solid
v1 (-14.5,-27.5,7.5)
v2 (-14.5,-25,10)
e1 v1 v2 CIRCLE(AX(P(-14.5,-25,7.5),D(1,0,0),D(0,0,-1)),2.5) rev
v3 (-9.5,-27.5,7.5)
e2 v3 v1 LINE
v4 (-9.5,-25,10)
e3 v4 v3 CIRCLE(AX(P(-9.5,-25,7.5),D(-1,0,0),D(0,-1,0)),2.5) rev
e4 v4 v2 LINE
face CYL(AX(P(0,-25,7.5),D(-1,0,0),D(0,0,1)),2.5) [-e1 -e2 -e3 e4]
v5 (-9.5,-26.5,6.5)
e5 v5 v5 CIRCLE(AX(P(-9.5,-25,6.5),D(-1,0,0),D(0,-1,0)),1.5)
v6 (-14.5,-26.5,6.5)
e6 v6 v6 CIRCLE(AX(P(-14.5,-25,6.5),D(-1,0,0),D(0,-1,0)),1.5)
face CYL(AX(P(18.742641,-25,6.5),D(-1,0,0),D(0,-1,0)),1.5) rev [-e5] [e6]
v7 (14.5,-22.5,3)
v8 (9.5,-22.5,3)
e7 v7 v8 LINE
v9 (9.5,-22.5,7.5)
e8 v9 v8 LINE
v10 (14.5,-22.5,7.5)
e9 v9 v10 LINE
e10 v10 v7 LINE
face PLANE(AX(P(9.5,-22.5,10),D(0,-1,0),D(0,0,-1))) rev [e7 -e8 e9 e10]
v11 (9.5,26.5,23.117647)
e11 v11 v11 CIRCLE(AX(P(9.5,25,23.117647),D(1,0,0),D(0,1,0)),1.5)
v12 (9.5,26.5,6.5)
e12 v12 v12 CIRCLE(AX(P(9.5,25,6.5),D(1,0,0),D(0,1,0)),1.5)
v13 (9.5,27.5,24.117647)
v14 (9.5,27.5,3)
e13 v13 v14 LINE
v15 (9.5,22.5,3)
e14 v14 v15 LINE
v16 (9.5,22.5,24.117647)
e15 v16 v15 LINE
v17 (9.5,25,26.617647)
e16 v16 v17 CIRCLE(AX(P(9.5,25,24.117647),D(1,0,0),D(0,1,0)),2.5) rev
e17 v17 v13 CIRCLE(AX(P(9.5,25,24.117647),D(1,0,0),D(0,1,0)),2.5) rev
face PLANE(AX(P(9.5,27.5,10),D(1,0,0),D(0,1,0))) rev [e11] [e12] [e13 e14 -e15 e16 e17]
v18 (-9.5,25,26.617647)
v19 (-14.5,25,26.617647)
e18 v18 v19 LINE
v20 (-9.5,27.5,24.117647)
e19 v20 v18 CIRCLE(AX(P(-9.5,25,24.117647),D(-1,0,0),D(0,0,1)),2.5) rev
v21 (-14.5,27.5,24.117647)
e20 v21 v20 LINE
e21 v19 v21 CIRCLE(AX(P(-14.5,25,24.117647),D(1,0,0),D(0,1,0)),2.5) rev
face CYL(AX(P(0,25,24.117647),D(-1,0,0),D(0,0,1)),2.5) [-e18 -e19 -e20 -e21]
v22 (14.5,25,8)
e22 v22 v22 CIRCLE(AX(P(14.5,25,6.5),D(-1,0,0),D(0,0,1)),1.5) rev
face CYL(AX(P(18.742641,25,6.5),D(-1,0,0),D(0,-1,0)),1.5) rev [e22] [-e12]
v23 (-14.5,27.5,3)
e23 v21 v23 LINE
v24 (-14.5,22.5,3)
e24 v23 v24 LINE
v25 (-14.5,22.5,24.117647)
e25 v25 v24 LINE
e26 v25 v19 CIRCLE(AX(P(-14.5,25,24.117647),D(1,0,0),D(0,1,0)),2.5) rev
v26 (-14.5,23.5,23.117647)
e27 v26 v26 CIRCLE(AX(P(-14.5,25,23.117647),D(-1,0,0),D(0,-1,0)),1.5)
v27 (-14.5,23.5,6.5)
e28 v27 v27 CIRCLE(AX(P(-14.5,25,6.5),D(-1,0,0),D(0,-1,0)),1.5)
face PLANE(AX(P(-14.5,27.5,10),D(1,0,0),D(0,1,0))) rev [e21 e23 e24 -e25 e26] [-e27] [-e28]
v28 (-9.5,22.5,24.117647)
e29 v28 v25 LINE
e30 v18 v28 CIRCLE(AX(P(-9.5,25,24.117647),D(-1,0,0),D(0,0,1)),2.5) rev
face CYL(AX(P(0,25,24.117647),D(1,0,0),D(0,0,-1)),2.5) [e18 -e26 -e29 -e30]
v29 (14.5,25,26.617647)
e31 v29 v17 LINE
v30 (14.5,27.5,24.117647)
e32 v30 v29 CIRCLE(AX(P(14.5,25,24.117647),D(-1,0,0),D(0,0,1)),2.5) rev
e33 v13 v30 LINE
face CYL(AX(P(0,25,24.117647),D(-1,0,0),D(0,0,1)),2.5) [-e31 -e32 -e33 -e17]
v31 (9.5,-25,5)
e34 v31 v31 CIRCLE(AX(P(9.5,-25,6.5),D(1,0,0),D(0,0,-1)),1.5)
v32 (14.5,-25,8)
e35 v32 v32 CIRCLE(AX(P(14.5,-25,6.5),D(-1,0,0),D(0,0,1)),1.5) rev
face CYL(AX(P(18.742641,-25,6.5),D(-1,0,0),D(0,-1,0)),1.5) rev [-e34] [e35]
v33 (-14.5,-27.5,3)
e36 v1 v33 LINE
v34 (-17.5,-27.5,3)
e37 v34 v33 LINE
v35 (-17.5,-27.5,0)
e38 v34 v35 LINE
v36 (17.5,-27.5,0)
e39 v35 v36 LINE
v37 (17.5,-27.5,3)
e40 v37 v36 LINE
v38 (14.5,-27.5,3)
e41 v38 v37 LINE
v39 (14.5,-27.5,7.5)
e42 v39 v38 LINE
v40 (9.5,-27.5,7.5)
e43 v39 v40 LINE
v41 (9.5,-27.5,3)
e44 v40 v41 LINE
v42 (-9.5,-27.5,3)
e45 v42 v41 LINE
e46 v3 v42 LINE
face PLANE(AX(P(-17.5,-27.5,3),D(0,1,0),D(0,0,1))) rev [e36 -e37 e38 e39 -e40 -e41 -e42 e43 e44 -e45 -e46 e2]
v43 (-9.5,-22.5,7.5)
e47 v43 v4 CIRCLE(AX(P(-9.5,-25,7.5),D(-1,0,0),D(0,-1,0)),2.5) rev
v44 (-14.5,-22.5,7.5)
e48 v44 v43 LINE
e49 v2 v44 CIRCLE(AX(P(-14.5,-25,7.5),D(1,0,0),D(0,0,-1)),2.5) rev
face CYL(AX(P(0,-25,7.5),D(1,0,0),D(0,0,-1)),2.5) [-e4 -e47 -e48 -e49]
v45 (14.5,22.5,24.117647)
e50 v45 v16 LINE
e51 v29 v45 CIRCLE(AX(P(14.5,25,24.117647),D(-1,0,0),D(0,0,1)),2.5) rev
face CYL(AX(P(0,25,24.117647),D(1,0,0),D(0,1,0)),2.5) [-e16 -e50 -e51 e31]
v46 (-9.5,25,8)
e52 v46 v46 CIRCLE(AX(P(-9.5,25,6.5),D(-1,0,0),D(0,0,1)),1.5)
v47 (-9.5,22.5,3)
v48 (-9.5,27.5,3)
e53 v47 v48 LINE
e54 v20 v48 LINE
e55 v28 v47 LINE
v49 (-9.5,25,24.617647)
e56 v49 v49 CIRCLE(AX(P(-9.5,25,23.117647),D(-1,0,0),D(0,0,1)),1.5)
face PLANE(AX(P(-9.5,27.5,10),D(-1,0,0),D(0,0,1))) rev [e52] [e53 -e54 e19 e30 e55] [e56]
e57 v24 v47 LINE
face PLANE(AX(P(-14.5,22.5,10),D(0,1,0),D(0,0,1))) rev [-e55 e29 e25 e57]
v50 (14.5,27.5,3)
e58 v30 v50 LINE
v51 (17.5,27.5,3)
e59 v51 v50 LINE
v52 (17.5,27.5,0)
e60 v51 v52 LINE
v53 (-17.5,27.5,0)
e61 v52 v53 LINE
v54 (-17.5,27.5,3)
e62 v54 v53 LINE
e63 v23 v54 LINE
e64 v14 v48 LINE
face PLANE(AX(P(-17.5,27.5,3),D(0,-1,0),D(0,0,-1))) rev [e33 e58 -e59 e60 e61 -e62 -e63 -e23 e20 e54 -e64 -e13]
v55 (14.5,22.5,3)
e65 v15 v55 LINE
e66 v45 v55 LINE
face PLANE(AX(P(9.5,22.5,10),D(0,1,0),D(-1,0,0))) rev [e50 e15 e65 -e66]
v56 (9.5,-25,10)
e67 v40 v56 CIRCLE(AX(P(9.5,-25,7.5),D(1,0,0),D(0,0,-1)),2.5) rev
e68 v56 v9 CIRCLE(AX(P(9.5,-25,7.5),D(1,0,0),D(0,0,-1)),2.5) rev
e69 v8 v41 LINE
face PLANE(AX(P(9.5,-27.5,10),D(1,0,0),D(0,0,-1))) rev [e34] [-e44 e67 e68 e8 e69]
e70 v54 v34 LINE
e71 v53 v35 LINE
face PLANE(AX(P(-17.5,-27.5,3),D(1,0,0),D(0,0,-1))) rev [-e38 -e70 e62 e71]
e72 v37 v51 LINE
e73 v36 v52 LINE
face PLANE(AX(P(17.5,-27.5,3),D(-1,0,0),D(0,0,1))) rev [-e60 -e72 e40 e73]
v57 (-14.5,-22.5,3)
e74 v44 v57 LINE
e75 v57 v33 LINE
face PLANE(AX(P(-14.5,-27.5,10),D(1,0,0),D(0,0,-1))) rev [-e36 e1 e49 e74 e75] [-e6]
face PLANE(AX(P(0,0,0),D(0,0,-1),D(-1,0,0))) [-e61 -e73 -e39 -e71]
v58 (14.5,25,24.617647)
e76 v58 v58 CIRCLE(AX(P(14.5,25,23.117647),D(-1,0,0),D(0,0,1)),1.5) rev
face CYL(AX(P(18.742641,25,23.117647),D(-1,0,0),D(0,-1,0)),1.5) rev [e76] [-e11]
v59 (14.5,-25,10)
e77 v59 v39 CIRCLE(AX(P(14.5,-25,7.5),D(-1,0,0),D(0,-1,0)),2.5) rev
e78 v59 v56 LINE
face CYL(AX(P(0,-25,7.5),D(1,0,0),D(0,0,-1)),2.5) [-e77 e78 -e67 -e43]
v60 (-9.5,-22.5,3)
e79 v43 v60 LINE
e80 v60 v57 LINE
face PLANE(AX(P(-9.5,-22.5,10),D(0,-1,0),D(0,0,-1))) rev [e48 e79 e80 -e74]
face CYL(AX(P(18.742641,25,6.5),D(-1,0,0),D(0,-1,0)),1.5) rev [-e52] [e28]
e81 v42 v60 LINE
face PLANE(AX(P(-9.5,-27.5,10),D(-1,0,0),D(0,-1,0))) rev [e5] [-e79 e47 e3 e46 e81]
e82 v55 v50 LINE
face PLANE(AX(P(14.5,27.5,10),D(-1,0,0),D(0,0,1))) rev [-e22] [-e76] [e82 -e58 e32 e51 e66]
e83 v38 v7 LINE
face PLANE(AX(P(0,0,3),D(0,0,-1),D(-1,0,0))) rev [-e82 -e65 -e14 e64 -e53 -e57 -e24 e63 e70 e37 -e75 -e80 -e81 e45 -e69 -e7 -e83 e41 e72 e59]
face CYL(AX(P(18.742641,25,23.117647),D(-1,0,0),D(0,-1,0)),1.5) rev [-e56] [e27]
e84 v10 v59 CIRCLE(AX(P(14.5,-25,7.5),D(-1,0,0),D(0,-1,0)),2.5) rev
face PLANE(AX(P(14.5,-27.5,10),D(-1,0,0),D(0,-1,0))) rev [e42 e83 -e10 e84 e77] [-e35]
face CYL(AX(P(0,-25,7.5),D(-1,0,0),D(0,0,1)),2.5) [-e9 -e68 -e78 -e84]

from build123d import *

# Parameters (mm, degrees)
SKETCH1_W           = 35
SKETCH1_H           = 55
BOSS_EXTRUDE1_DEPTH = 3
SKETCH2_W           = 5
SKETCH2_H           = 5
BOSS_EXTRUDE2_DEPTH = 7
CUT_EXTRUDE1_REACH  = 45.362
FILLET1_R           = 2.5
SKETCH4_W           = 5
SKETCH4_H           = 5
BOSS_EXTRUDE3_DEPTH = 16.61764706
CUT_EXTRUDE2_REACH  = 51.887
FILLET2_R           = 2.5


with BuildPart() as part:
    # Sketch1 → Boss-Extrude1 (new body)
    with BuildSketch(Plane.XY):
        Rectangle(SKETCH1_W, SKETCH1_H)
    extrude(amount=BOSS_EXTRUDE1_DEPTH)

    # Sketch2 → Boss-Extrude2 (add)
    with BuildSketch(Plane.XY.offset(3)):
        with Locations((-12, 25)):
            Rectangle(SKETCH2_W, SKETCH2_H)
        with Locations((12, 25)):
            Rectangle(SKETCH2_W, SKETCH2_H)
        with Locations((-12, -25)):
            Rectangle(SKETCH2_W, SKETCH2_H)
        with Locations((12, -25)):
            Rectangle(SKETCH2_W, SKETCH2_H)
    extrude(amount=BOSS_EXTRUDE2_DEPTH)

    # Cut-Extrude1: up to this face of the body (flat: up to its plane)
    cut_extrude1_end = Plane(part.part.faces().sort_by_distance((14.5, 25, 6.5))[0])
    # Sketch3 → Cut-Extrude1 (cut, up to the picked face)
    with BuildSketch(Plane.ZY.offset(14.5), mode=Mode.PRIVATE) as cut_extrude1_sk1:
        with BuildLine():
            ThreePointArc((8, 25), (6.957766147, 26.428443263), (5.279399793, 25.871857291))
            Line((5.279399793, 25.871857291), (7.720600207, 24.128142709))
            ThreePointArc((7.720600207, 24.128142709), (7.928443263, 24.542233853), (8, 25))
        make_face()
    cut_extrude1_tool1 = split(extrude(cut_extrude1_sk1.sketch, amount=-CUT_EXTRUDE1_REACH, mode=Mode.PRIVATE), bisect_by=cut_extrude1_end, keep=Keep.BOTH, mode=Mode.PRIVATE)
    # Sketch3 → Cut-Extrude1 (cut, up to the picked face)
    with BuildSketch(Plane.ZY.offset(14.5), mode=Mode.PRIVATE) as cut_extrude1_sk2:
        with BuildLine():
            Line((7.720600207, 24.128142709), (5.279399793, 25.871857291))
            ThreePointArc((5.279399793, 25.871857291), (5.628142709, 23.779399793), (7.720600207, 24.128142709))
        make_face()
    cut_extrude1_tool2 = split(extrude(cut_extrude1_sk2.sketch, amount=-CUT_EXTRUDE1_REACH, mode=Mode.PRIVATE), bisect_by=cut_extrude1_end, keep=Keep.BOTH, mode=Mode.PRIVATE)
    # Sketch3 → Cut-Extrude1 (cut, up to the picked face)
    with BuildSketch(Plane.ZY.offset(14.5), mode=Mode.PRIVATE) as cut_extrude1_sk3:
        with BuildLine():
            ThreePointArc((8, 25), (6.957766147, 26.428443263), (5.279399793, 25.871857291))
            Line((5.279399793, 25.871857291), (7.720600207, 24.128142709))
            ThreePointArc((7.720600207, 24.128142709), (7.928443263, 24.542233853), (8, 25))
        make_face()
    cut_extrude1_tool3 = split(extrude(cut_extrude1_sk3.sketch, amount=-CUT_EXTRUDE1_REACH, mode=Mode.PRIVATE), bisect_by=cut_extrude1_end, keep=Keep.BOTH, mode=Mode.PRIVATE)
    # Sketch3 → Cut-Extrude1 (cut, up to the picked face)
    with BuildSketch(Plane.ZY.offset(14.5), mode=Mode.PRIVATE) as cut_extrude1_sk4:
        with BuildLine():
            Line((7.720600207, 24.128142709), (5.279399793, 25.871857291))
            ThreePointArc((5.279399793, 25.871857291), (5.628142709, 23.779399793), (7.720600207, 24.128142709))
        make_face()
    cut_extrude1_tool4 = split(extrude(cut_extrude1_sk4.sketch, amount=-CUT_EXTRUDE1_REACH, mode=Mode.PRIVATE), bisect_by=cut_extrude1_end, keep=Keep.BOTH, mode=Mode.PRIVATE)
    # Sketch3 → Cut-Extrude1 (cut, up to the picked face)
    with BuildSketch(Plane.ZY.offset(14.5), mode=Mode.PRIVATE) as cut_extrude1_sk5:
        with BuildLine():
            ThreePointArc((8, -25), (6.957766147, -23.571556737), (5.279399793, -24.128142709))
            Line((5.279399793, -24.128142709), (7.720600207, -25.871857291))
            ThreePointArc((7.720600207, -25.871857291), (7.928443263, -25.457766147), (8, -25))
        make_face()
    cut_extrude1_tool5 = split(extrude(cut_extrude1_sk5.sketch, amount=-CUT_EXTRUDE1_REACH, mode=Mode.PRIVATE), bisect_by=cut_extrude1_end, keep=Keep.BOTH, mode=Mode.PRIVATE)
    # Sketch3 → Cut-Extrude1 (cut, up to the picked face)
    with BuildSketch(Plane.ZY.offset(14.5), mode=Mode.PRIVATE) as cut_extrude1_sk6:
        with BuildLine():
            Line((7.720600207, -25.871857291), (5.279399793, -24.128142709))
            ThreePointArc((5.279399793, -24.128142709), (5.628142709, -26.220600207), (7.720600207, -25.871857291))
        make_face()
    cut_extrude1_tool6 = split(extrude(cut_extrude1_sk6.sketch, amount=-CUT_EXTRUDE1_REACH, mode=Mode.PRIVATE), bisect_by=cut_extrude1_end, keep=Keep.BOTH, mode=Mode.PRIVATE)
    # Sketch3 → Cut-Extrude1 (cut, up to the picked face)
    with BuildSketch(Plane.ZY.offset(14.5), mode=Mode.PRIVATE) as cut_extrude1_sk7:
        with BuildLine():
            ThreePointArc((8, -25), (6.957766147, -23.571556737), (5.279399793, -24.128142709))
            Line((5.279399793, -24.128142709), (7.720600207, -25.871857291))
            ThreePointArc((7.720600207, -25.871857291), (7.928443263, -25.457766147), (8, -25))
        make_face()
    cut_extrude1_tool7 = split(extrude(cut_extrude1_sk7.sketch, amount=-CUT_EXTRUDE1_REACH, mode=Mode.PRIVATE), bisect_by=cut_extrude1_end, keep=Keep.BOTH, mode=Mode.PRIVATE)
    # Sketch3 → Cut-Extrude1 (cut, up to the picked face)
    with BuildSketch(Plane.ZY.offset(14.5), mode=Mode.PRIVATE) as cut_extrude1_sk8:
        with BuildLine():
            Line((7.720600207, -25.871857291), (5.279399793, -24.128142709))
            ThreePointArc((5.279399793, -24.128142709), (5.628142709, -26.220600207), (7.720600207, -25.871857291))
        make_face()
    cut_extrude1_tool8 = split(extrude(cut_extrude1_sk8.sketch, amount=-CUT_EXTRUDE1_REACH, mode=Mode.PRIVATE), bisect_by=cut_extrude1_end, keep=Keep.BOTH, mode=Mode.PRIVATE)
    add(cut_extrude1_tool1.solids().sort_by(Axis((-14.5, 25.518039, 6.870028), (1, 0, 0)))[0], mode=Mode.SUBTRACT)
    add(cut_extrude1_tool2.solids().sort_by(Axis((-14.5, 24.481961, 6.129972), (1, 0, 0)))[0], mode=Mode.SUBTRACT)
    add(cut_extrude1_tool3.solids().sort_by(Axis((-14.5, 25.518039, 6.870028), (1, 0, 0)))[0], mode=Mode.SUBTRACT)
    add(cut_extrude1_tool4.solids().sort_by(Axis((-14.5, 24.481961, 6.129972), (1, 0, 0)))[0], mode=Mode.SUBTRACT)
    add(cut_extrude1_tool5.solids().sort_by(Axis((-14.5, -24.481961, 6.870028), (1, 0, 0)))[0], mode=Mode.SUBTRACT)
    add(cut_extrude1_tool6.solids().sort_by(Axis((-14.5, -25.518039, 6.129972), (1, 0, 0)))[0], mode=Mode.SUBTRACT)
    add(cut_extrude1_tool7.solids().sort_by(Axis((-14.5, -24.481961, 6.870028), (1, 0, 0)))[0], mode=Mode.SUBTRACT)
    add(cut_extrude1_tool8.solids().sort_by(Axis((-14.5, -25.518039, 6.129972), (1, 0, 0)))[0], mode=Mode.SUBTRACT)

    # Fillet1
    fillet1_edges = [part.edges().sort_by_distance(p)[0] for p in [
        (12, -27.5, 10),
        (12, -22.5, 10),
        (-12, -27.5, 10),
        (-12, -22.5, 10),
    ]]
    fillet(fillet1_edges, radius=FILLET1_R - 0.0001)  # a hair under: the kernel refuses the full size

    # Sketch4 → Boss-Extrude3 (add)
    with BuildSketch(Plane.XY.offset(10)):
        with Locations((-12, 25)):
            Rectangle(SKETCH4_W, SKETCH4_H)
        with Locations((12, 25)):
            Rectangle(SKETCH4_W, SKETCH4_H)
    extrude(amount=BOSS_EXTRUDE3_DEPTH)

    # Cut-Extrude2: up to this face of the body (flat: up to its plane)
    cut_extrude2_end = Plane(part.part.faces().sort_by_distance((14.5, 25, 15.337843498))[0])
    # Sketch5 → Cut-Extrude2 (cut, up to the picked face)
    with BuildSketch(Plane.ZY.offset(14.5), mode=Mode.PRIVATE) as cut_extrude2_sk1:
        with BuildLine():
            ThreePointArc((24.61764706, 25), (23.575413207, 26.428443263), (21.897046853, 25.871857291))
            Line((21.897046853, 25.871857291), (24.338247267, 24.128142709))
            ThreePointArc((24.338247267, 24.128142709), (24.546090323, 24.542233853), (24.61764706, 25))
        make_face()
    cut_extrude2_tool1 = split(extrude(cut_extrude2_sk1.sketch, amount=-CUT_EXTRUDE2_REACH, mode=Mode.PRIVATE), bisect_by=cut_extrude2_end, keep=Keep.BOTH, mode=Mode.PRIVATE)
    # Sketch5 → Cut-Extrude2 (cut, up to the picked face)
    with BuildSketch(Plane.ZY.offset(14.5), mode=Mode.PRIVATE) as cut_extrude2_sk2:
        with BuildLine():
            Line((24.338247267, 24.128142709), (21.897046853, 25.871857291))
            ThreePointArc((21.897046853, 25.871857291), (22.245789769, 23.779399793), (24.338247267, 24.128142709))
        make_face()
    cut_extrude2_tool2 = split(extrude(cut_extrude2_sk2.sketch, amount=-CUT_EXTRUDE2_REACH, mode=Mode.PRIVATE), bisect_by=cut_extrude2_end, keep=Keep.BOTH, mode=Mode.PRIVATE)
    # Sketch5 → Cut-Extrude2 (cut, up to the picked face)
    with BuildSketch(Plane.ZY.offset(14.5), mode=Mode.PRIVATE) as cut_extrude2_sk3:
        with BuildLine():
            ThreePointArc((24.61764706, 25), (23.575413207, 26.428443263), (21.897046853, 25.871857291))
            Line((21.897046853, 25.871857291), (24.338247267, 24.128142709))
            ThreePointArc((24.338247267, 24.128142709), (24.546090323, 24.542233853), (24.61764706, 25))
        make_face()
    cut_extrude2_tool3 = split(extrude(cut_extrude2_sk3.sketch, amount=-CUT_EXTRUDE2_REACH, mode=Mode.PRIVATE), bisect_by=cut_extrude2_end, keep=Keep.BOTH, mode=Mode.PRIVATE)
    # Sketch5 → Cut-Extrude2 (cut, up to the picked face)
    with BuildSketch(Plane.ZY.offset(14.5), mode=Mode.PRIVATE) as cut_extrude2_sk4:
        with BuildLine():
            Line((24.338247267, 24.128142709), (21.897046853, 25.871857291))
            ThreePointArc((21.897046853, 25.871857291), (22.245789769, 23.779399793), (24.338247267, 24.128142709))
        make_face()
    cut_extrude2_tool4 = split(extrude(cut_extrude2_sk4.sketch, amount=-CUT_EXTRUDE2_REACH, mode=Mode.PRIVATE), bisect_by=cut_extrude2_end, keep=Keep.BOTH, mode=Mode.PRIVATE)
    add(cut_extrude2_tool1.solids().sort_by(Axis((-14.5, 25.518039, 23.487675), (1, 0, 0)))[0], mode=Mode.SUBTRACT)
    add(cut_extrude2_tool2.solids().sort_by(Axis((-14.5, 24.481961, 22.747619), (1, 0, 0)))[0], mode=Mode.SUBTRACT)
    add(cut_extrude2_tool3.solids().sort_by(Axis((-14.5, 25.518039, 23.487675), (1, 0, 0)))[0], mode=Mode.SUBTRACT)
    add(cut_extrude2_tool4.solids().sort_by(Axis((-14.5, 24.481961, 22.747619), (1, 0, 0)))[0], mode=Mode.SUBTRACT)

    # Fillet2
    fillet2_edges = [part.edges().sort_by_distance(p)[0] for p in [
        (12, 22.5, 26.61764706),
        (12, 27.5, 26.61764706),
        (-12, 22.5, 26.61764706),
        (-12, 27.5, 26.61764706),
    ]]
    fillet(fillet2_edges, radius=FILLET2_R - 0.0001)  # a hair under: the kernel refuses the full size


solid = part.part
